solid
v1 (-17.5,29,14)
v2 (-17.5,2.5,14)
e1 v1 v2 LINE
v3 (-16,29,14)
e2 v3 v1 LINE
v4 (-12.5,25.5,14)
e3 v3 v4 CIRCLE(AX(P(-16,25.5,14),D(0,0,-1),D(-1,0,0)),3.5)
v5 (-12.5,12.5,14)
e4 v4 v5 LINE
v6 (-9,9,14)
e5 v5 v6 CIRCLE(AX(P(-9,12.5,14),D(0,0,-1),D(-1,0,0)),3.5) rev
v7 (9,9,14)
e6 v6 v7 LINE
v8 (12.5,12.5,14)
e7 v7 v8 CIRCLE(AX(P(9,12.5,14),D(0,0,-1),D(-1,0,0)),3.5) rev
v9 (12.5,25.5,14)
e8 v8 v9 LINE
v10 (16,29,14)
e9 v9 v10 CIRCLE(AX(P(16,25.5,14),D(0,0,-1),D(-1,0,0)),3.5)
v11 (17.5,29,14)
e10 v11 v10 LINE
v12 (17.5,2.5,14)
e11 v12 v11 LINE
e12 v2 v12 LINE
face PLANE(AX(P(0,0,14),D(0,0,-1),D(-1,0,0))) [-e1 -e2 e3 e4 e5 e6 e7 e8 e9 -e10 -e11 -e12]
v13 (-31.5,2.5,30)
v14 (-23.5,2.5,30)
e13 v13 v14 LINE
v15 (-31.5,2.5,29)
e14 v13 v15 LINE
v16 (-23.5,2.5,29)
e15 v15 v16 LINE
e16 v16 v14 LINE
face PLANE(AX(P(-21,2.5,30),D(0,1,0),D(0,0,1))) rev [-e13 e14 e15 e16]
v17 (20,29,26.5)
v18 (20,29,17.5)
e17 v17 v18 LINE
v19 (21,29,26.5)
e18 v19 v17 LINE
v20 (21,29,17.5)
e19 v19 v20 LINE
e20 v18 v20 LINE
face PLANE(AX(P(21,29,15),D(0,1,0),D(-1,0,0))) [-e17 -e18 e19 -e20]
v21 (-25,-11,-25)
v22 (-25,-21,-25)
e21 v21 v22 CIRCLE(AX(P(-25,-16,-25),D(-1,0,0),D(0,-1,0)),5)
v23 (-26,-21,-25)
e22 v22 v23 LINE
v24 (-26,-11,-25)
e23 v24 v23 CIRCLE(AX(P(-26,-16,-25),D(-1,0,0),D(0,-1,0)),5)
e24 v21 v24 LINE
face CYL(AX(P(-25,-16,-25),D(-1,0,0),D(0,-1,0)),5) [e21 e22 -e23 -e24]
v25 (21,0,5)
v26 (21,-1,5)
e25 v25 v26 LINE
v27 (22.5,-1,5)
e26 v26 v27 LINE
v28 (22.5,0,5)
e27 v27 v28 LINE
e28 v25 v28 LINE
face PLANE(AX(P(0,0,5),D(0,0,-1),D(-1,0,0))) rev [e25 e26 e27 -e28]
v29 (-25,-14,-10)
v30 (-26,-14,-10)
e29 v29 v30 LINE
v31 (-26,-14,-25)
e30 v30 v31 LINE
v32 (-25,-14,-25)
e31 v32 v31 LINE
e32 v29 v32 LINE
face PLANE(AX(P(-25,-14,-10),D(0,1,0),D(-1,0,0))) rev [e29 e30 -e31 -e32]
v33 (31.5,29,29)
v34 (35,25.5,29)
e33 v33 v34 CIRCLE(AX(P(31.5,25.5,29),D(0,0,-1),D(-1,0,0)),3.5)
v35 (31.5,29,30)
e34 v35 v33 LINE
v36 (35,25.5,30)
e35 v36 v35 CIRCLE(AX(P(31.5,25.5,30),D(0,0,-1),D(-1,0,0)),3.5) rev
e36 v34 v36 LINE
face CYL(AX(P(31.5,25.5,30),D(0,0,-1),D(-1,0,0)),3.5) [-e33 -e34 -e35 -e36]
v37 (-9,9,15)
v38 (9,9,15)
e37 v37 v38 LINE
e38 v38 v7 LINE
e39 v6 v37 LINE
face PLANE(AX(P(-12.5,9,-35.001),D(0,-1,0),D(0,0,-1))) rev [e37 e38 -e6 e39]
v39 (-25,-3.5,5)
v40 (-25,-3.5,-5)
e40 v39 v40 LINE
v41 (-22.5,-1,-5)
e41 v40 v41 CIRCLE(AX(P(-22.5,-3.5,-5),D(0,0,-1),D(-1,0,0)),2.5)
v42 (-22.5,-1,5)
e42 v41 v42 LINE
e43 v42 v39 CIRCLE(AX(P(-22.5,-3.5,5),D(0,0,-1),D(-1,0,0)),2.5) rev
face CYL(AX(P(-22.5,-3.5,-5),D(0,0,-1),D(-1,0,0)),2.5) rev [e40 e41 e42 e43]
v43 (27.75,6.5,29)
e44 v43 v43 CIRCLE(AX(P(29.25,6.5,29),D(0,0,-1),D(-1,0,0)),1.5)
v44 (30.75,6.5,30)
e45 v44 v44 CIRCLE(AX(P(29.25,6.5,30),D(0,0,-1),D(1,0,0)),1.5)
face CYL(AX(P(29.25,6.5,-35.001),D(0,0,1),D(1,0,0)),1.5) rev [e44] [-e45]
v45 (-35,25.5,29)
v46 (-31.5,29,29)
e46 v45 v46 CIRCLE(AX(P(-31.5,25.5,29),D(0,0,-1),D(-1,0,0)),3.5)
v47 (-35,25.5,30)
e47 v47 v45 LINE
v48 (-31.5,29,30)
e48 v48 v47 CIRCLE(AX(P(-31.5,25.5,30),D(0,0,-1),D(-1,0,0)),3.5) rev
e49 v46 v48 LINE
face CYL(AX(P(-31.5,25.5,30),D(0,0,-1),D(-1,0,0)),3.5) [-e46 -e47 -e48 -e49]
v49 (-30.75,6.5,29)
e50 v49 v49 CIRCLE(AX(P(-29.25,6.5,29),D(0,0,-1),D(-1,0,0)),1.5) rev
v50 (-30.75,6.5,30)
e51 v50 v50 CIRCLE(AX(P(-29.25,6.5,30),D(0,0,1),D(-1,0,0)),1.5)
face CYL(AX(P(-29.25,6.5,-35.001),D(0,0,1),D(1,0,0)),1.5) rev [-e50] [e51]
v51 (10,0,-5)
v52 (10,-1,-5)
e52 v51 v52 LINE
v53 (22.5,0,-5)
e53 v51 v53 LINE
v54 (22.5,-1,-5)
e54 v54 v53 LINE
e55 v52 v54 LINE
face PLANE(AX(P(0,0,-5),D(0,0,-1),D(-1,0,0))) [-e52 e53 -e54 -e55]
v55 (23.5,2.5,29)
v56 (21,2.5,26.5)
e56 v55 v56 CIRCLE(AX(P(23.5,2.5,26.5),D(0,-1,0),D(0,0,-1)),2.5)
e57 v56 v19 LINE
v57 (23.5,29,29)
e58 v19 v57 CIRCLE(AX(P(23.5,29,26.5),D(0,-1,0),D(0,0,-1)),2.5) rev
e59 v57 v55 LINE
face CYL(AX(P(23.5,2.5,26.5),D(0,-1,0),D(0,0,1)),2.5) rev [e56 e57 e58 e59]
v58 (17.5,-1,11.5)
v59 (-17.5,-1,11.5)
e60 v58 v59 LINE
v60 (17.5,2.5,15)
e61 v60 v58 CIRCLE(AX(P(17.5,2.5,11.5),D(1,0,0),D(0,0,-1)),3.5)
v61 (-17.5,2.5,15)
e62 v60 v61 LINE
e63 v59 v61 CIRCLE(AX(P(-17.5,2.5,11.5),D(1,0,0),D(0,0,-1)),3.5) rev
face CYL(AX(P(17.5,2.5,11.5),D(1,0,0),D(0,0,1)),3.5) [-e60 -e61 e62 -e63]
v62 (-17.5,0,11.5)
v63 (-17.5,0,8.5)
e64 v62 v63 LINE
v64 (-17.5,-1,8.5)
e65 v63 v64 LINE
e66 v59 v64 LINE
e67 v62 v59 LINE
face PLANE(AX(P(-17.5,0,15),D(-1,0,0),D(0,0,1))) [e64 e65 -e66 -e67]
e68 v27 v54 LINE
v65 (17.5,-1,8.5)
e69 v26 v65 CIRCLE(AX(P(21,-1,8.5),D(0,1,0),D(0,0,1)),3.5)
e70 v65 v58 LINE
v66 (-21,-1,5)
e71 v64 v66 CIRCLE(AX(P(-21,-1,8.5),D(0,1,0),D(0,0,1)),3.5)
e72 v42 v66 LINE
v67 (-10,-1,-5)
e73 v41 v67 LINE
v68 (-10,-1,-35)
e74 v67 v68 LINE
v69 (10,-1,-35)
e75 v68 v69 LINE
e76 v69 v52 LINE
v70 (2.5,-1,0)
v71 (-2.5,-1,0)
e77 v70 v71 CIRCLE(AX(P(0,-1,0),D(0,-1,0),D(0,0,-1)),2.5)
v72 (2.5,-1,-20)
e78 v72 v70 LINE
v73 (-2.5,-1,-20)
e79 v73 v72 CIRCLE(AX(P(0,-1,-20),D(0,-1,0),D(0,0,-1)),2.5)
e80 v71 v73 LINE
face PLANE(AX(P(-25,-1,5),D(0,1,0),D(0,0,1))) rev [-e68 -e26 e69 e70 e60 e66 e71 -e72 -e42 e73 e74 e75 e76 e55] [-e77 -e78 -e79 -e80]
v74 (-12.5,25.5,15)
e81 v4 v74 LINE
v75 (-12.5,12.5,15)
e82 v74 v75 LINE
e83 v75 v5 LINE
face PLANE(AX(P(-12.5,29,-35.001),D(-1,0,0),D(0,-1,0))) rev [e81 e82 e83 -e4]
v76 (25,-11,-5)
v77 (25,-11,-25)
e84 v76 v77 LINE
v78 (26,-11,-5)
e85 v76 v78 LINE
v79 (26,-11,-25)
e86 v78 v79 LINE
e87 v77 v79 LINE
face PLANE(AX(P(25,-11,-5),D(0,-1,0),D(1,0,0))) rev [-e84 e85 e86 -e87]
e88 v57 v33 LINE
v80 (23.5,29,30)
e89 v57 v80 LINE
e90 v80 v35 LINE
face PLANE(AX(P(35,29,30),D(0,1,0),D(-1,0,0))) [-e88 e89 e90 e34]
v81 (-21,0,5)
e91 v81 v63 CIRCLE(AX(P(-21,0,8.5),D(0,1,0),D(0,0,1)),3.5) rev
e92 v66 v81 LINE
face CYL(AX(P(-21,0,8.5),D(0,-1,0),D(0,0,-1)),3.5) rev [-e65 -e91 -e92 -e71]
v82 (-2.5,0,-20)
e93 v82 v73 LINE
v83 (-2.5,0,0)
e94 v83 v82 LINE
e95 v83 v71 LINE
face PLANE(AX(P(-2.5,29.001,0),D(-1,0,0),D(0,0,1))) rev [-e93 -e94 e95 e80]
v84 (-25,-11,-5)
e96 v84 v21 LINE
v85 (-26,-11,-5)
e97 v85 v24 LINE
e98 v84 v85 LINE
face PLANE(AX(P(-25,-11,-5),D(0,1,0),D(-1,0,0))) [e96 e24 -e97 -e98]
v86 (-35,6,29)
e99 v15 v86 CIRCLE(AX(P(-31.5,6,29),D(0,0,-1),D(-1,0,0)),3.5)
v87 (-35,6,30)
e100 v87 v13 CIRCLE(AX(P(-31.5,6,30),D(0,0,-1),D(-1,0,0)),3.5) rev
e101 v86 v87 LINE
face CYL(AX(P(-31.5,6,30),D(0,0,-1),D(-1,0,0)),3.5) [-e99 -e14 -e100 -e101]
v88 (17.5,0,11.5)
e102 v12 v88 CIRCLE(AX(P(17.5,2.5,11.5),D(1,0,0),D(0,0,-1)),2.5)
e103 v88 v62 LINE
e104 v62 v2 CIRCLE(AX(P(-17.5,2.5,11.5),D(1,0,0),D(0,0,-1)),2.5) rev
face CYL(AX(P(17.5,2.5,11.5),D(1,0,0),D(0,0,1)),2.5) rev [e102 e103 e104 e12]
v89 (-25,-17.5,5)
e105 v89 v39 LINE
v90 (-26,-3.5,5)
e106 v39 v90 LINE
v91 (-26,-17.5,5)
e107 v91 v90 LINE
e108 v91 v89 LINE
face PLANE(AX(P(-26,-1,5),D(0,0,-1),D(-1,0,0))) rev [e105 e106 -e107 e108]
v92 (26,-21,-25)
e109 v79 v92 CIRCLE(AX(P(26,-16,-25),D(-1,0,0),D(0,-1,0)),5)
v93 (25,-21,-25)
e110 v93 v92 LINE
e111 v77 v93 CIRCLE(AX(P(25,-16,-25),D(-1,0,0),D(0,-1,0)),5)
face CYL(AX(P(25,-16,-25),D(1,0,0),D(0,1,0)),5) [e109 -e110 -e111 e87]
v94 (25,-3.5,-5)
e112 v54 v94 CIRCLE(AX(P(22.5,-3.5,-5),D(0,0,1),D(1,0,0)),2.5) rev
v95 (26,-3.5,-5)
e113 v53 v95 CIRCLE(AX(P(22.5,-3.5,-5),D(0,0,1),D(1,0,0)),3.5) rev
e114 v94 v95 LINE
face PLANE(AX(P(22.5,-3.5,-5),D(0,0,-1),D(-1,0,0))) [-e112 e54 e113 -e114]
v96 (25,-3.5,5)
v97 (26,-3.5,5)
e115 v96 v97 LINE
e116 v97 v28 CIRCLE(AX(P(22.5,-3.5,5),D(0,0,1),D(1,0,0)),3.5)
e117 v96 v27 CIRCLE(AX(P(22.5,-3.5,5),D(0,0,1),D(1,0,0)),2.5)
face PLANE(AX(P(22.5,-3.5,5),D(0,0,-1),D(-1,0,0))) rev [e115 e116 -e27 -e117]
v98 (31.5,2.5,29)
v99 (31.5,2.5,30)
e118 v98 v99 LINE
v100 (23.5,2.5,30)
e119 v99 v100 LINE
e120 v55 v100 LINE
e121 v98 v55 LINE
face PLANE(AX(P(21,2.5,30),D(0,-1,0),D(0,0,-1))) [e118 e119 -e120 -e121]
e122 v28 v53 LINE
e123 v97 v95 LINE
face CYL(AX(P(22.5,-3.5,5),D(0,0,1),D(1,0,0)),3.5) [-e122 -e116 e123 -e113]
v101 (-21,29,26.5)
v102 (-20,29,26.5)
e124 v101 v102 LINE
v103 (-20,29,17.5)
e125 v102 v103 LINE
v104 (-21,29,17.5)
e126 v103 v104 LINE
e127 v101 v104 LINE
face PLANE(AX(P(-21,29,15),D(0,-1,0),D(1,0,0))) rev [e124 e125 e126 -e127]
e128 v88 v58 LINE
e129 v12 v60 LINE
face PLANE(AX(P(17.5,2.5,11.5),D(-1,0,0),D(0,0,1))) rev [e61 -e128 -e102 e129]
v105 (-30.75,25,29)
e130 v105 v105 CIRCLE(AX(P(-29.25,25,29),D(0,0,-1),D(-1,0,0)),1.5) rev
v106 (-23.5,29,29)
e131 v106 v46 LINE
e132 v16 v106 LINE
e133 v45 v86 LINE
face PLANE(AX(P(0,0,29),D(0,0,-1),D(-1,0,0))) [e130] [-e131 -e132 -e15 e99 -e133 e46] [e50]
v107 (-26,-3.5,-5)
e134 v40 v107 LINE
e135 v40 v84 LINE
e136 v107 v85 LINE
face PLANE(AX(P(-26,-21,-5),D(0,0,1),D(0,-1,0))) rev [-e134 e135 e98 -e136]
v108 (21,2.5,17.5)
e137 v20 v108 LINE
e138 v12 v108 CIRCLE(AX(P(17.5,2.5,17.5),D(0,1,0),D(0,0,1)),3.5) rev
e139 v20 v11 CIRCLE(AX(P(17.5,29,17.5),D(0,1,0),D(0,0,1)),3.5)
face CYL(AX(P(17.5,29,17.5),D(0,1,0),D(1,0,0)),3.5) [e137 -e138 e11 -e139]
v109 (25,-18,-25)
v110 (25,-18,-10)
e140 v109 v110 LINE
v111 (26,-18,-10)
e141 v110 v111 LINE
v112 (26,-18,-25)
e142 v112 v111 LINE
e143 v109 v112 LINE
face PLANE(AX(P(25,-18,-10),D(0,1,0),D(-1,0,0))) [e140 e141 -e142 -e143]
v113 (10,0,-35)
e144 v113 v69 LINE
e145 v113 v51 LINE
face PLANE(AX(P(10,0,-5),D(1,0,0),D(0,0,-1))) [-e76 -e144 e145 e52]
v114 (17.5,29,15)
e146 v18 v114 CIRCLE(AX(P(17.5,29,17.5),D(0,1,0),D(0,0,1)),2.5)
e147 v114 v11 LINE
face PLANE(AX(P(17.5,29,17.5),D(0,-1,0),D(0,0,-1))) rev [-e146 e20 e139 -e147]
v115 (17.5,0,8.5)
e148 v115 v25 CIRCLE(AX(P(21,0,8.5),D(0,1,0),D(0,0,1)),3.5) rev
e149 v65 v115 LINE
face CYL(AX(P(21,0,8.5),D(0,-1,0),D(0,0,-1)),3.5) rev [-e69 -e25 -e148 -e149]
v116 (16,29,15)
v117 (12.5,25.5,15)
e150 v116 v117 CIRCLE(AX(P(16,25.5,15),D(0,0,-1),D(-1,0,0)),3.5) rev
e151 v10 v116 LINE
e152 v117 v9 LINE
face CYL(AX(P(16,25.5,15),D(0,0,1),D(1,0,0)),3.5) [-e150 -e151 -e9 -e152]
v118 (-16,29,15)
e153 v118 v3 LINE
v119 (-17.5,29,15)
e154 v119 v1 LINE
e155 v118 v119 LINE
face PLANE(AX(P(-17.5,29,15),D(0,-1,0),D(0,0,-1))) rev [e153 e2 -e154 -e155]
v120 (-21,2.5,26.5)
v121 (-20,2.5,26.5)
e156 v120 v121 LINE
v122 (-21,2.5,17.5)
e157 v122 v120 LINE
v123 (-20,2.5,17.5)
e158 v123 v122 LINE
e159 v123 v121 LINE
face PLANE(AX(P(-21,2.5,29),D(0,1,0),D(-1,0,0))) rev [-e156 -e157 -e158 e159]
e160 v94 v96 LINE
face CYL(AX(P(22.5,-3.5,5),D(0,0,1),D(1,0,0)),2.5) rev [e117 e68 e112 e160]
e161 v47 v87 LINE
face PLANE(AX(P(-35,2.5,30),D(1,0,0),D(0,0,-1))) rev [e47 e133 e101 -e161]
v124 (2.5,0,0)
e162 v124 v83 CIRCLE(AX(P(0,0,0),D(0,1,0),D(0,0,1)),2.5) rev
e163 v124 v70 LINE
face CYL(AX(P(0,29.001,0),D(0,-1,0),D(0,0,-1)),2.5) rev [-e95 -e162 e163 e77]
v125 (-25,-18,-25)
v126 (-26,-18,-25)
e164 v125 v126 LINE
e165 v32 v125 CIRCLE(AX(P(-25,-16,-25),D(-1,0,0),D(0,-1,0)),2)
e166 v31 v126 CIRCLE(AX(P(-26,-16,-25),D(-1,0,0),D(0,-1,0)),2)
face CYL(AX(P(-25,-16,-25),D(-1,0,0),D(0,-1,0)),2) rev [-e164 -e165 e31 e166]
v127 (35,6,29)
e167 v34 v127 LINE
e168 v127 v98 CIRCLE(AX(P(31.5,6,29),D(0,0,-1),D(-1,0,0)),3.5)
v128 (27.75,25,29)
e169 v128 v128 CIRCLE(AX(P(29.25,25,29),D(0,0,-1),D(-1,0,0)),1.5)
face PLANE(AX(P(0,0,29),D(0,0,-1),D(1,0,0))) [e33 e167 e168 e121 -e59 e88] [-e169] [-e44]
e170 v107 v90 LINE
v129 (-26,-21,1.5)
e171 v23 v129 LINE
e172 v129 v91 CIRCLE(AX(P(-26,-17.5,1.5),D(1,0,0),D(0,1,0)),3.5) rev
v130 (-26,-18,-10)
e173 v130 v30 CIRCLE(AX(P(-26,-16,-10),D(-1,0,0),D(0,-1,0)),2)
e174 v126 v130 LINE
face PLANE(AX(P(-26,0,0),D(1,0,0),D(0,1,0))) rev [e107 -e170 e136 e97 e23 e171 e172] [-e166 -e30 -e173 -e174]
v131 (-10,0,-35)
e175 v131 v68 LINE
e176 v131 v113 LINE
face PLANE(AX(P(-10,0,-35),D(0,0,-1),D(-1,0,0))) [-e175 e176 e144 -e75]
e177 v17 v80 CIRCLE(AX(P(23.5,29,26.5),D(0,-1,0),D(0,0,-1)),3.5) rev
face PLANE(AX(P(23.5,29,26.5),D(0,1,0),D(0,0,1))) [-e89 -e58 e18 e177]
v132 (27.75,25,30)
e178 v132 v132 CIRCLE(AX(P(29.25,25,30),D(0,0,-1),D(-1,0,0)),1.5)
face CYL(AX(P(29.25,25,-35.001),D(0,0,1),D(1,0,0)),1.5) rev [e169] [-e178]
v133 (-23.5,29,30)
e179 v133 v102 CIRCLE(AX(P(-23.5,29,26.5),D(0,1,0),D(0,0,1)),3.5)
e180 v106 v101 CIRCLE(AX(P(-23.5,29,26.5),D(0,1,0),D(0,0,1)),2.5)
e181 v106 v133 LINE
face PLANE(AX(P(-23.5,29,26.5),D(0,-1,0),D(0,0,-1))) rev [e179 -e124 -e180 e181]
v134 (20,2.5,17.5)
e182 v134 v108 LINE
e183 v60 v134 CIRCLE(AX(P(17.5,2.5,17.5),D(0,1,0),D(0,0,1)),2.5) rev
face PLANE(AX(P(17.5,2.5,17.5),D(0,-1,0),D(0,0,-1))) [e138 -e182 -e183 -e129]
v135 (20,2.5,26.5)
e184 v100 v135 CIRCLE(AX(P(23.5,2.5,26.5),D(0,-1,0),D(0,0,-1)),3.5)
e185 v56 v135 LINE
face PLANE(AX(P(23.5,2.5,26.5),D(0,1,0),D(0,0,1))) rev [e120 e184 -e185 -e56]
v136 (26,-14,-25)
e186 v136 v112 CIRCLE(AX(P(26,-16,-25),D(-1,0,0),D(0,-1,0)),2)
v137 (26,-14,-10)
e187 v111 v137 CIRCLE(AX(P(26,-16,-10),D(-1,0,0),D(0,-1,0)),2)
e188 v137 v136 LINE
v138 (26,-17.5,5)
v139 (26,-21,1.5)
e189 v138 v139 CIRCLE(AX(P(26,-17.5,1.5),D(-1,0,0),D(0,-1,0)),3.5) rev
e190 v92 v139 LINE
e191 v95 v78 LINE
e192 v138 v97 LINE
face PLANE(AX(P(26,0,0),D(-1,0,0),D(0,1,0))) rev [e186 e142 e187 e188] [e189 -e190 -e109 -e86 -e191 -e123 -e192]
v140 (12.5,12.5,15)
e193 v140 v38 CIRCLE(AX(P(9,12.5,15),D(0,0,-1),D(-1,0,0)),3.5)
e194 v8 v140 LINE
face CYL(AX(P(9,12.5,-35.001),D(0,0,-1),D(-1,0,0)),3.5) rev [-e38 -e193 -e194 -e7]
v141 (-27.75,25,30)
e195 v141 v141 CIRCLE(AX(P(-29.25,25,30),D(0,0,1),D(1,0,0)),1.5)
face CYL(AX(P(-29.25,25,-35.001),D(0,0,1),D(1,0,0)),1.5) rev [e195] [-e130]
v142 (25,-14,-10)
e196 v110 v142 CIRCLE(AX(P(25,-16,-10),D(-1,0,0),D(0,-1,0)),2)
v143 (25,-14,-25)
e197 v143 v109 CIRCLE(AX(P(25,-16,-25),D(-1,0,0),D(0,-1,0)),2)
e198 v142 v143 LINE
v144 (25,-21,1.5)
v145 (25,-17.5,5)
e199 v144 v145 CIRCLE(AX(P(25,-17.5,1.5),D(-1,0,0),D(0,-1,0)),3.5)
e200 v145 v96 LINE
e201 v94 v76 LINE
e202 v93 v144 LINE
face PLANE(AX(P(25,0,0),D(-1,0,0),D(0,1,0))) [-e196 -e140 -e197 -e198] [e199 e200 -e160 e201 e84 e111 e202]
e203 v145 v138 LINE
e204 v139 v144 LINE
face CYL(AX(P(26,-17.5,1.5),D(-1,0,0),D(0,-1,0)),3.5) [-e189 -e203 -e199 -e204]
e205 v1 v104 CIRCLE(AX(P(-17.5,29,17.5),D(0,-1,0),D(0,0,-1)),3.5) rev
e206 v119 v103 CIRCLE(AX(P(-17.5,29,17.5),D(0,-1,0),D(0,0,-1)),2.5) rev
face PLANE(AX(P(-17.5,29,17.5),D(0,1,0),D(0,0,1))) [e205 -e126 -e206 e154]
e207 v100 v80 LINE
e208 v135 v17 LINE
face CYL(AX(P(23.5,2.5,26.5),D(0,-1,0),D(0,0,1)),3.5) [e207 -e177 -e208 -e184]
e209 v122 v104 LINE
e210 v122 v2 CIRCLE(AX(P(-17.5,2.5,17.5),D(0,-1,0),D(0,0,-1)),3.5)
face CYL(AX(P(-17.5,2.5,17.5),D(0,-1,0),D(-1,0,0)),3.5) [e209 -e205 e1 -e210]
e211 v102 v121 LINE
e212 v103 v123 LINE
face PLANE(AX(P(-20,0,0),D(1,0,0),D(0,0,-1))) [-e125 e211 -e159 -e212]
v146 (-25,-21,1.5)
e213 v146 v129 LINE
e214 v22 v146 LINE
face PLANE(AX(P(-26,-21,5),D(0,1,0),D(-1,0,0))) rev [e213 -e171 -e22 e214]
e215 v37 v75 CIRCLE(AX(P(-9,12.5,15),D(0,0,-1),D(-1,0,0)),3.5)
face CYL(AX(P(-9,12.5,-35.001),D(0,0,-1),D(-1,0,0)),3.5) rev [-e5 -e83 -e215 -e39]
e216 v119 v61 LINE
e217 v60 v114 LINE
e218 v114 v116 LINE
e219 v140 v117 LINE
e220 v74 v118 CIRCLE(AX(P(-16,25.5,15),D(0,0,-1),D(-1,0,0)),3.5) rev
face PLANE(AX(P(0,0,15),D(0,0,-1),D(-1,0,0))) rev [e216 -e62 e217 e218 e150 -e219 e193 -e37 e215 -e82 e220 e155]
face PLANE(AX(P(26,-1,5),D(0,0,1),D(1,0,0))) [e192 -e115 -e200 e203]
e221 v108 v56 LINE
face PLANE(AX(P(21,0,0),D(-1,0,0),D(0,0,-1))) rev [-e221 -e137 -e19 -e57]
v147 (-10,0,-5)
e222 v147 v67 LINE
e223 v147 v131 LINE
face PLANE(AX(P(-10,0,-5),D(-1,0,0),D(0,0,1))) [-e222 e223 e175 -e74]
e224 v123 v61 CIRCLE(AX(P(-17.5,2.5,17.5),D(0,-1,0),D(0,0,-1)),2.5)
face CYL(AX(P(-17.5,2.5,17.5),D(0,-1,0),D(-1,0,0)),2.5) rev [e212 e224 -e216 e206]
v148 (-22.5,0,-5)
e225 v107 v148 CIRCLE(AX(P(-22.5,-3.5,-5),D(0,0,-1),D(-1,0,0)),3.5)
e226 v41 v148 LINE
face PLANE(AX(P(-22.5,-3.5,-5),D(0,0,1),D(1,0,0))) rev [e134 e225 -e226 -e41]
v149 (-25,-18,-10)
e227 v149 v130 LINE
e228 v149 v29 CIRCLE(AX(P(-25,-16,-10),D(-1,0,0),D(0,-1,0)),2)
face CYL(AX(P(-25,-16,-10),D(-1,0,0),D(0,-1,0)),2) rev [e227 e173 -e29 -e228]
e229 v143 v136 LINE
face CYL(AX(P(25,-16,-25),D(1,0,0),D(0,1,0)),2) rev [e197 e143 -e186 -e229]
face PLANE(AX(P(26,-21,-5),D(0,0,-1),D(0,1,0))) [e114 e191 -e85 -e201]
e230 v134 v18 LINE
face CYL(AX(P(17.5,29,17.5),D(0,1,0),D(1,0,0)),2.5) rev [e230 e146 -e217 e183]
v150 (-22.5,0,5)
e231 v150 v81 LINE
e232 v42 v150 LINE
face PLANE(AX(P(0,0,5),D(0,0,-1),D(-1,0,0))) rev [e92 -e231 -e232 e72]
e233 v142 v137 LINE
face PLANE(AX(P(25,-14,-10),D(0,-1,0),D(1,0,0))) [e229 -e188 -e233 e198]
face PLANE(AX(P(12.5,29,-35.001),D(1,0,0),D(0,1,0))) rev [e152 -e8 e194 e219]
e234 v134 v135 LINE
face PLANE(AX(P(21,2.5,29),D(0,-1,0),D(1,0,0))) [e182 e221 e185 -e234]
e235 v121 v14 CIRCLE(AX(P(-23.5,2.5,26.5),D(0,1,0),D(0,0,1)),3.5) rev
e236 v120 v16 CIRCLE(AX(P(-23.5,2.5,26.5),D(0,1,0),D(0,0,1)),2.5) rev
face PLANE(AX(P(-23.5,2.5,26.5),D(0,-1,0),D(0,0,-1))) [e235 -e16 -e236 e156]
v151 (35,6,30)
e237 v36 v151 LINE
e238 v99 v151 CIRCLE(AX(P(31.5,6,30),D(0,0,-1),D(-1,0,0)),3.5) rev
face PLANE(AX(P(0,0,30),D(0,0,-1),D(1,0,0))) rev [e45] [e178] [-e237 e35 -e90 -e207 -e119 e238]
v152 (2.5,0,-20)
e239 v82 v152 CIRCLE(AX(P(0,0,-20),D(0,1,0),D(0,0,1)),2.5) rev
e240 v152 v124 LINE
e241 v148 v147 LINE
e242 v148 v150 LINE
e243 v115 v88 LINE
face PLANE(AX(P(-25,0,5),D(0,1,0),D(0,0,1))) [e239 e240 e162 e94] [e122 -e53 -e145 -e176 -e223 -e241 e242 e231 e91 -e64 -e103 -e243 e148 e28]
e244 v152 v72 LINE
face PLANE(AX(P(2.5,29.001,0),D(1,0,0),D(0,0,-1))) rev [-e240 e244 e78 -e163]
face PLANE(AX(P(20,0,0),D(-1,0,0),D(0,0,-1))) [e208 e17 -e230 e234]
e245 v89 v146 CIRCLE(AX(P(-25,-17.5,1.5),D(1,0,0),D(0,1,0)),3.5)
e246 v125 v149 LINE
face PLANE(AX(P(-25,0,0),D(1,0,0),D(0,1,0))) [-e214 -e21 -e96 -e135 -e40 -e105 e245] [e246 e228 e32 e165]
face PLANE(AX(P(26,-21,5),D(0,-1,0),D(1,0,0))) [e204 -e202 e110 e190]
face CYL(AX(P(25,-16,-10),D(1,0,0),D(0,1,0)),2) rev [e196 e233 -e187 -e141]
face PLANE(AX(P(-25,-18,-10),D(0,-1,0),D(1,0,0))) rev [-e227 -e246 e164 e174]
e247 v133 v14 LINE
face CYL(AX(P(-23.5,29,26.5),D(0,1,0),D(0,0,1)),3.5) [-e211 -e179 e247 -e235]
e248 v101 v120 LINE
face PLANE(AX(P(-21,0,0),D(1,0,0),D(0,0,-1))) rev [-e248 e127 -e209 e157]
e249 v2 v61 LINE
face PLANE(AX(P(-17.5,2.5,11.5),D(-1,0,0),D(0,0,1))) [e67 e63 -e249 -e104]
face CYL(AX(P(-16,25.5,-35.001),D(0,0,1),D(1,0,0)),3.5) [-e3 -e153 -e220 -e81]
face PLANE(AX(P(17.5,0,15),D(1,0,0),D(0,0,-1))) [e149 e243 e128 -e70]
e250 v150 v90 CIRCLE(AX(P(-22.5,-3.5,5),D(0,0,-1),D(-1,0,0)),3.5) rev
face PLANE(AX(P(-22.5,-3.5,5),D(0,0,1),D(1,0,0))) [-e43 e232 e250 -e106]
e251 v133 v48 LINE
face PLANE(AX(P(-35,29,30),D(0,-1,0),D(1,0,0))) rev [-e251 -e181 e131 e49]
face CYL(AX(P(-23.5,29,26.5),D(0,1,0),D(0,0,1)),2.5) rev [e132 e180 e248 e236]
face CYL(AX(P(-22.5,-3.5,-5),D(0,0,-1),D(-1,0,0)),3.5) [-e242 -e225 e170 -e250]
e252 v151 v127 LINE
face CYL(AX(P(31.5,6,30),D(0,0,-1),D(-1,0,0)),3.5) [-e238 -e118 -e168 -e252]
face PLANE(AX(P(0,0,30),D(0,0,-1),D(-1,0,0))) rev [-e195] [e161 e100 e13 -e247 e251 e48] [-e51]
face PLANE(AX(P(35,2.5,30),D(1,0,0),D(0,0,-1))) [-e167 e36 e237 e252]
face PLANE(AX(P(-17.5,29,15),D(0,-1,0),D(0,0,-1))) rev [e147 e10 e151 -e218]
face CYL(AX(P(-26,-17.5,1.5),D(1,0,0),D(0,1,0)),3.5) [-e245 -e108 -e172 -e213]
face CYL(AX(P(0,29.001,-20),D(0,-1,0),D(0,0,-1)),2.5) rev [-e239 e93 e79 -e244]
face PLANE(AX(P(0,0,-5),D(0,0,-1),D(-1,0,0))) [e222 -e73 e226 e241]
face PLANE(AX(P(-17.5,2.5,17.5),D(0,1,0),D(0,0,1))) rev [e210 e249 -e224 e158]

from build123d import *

# Parameters (mm, degrees)
SKETCH_1_W                       = 50
SKETCH_1_H                       = 1
SM_BASE_FLANGE_1_DEPTH           = 5
SM_EDGE_FLANGE_1_STRIP_W         = 9
SM_EDGE_FLANGE_1_STRIP_H         = 1
SM_EDGE_FLANGE_1_STRIP_CUT_DEPTH = 10
SM_EDGE_FLANGE_1_DEPTH           = 10
SM_BASE_FLANGE_1_2_DEPTH         = 1
SKETCH_12_W                      = 20
SKETCH_12_H                      = 30
SKETCH_12_W_2                    = 35
SKETCH_12_H_2                    = 10
SM_BASE_FLANGE_2_DEPTH           = 1
SM_EDGE_FLANGE_3_STRIP_W         = 9
SM_EDGE_FLANGE_3_STRIP_H         = 1
SM_EDGE_FLANGE_3_STRIP_CUT_DEPTH = 35
SM_EDGE_FLANGE_3_DEPTH           = 35
CUT_EXTRUDE_1_REACH              = 65.38
SKETCH_21_W                      = 25
SKETCH_21_H                      = 20
SM_EDGE_FLANGE_4_DEPTH           = 26.5
SM_EDGE_FLANGE_5_STRIP_W         = 9
SM_EDGE_FLANGE_5_STRIP_H         = 1
SM_EDGE_FLANGE_5_STRIP_CUT_DEPTH = 26.5
SM_EDGE_FLANGE_5_DEPTH           = 26.5
CUT_EXTRUDE_2_REACH              = 81.316
SKETCH_28_R                      = 1.5
FILLET_1_R                       = 3.5
CUT_EXTRUDE_3_REACH              = 59.879


# Sheet-metal steps are written as plain solids
with BuildPart() as part:
    # Sketch 1 → Sm Base Flange 1 (new, symmetric)
    with BuildSketch(Plane.XY):
        with Locations((0, -0.5)):
            Rectangle(SKETCH_1_W, SKETCH_1_H)
    extrude(amount=SM_BASE_FLANGE_1_DEPTH, both=True)

    # 边线-法兰1 strip (across the edge) → 边线-法兰1 strip cut (cut)
    with BuildSketch(Plane(origin=(-25, -1, 5), x_dir=(1, 0, 0), z_dir=(0, 0, -1))):
        with Locations((-2, -0.5)):
            Rectangle(SM_EDGE_FLANGE_1_STRIP_W, SM_EDGE_FLANGE_1_STRIP_H)
    sm_edge_flange_1_strip_cut = extrude(amount=SM_EDGE_FLANGE_1_STRIP_CUT_DEPTH, mode=Mode.SUBTRACT)

    # 边线-法兰1 section (across the edge) → 边线-法兰1 (add)
    with BuildSketch(Plane(origin=(-25, -1, 5), x_dir=(1, 0, 0), z_dir=(0, 0, -1))):
        with BuildLine():
            Line((-1, 2.5), (-1, 20))
            Line((-1, 20), (0, 20))
            Line((0, 20), (0, 2.5))
            ThreePointArc((0, 2.5), (0.732233047, 0.732233047), (2.5, 0))
            Line((2.5, 0), (2.5, -1))
            ThreePointArc((2.5, -1), (0.025126266, 0.025126266), (-1, 2.5))
        make_face()
    sm_edge_flange_1 = extrude(amount=SM_EDGE_FLANGE_1_DEPTH)

    # 草图9 → Sm Base Flange 1 2 (add)
    with BuildSketch(Plane.ZY.offset(26)):
        with BuildLine():
            Line((-5, -21), (-25, -21))
            ThreePointArc((-25, -21), (-30, -16), (-25, -11))
            Line((-25, -11), (-5, -11))
            Line((-5, -11), (-5, -21))
        make_face()
        with BuildLine():
            Line((-10, -18), (-25, -18))
            ThreePointArc((-25, -18), (-27, -16), (-25, -14))
            Line((-25, -14), (-10, -14))
            ThreePointArc((-10, -14), (-8, -16), (-10, -18))
        make_face(mode=Mode.SUBTRACT)
    sm_base_flange_1_2 = extrude(amount=-SM_BASE_FLANGE_1_2_DEPTH)

    # 镜向1: 边线-法兰1 strip cut, 边线-法兰1, Sm Base Flange 1 2 across plane
    add(sm_edge_flange_1_strip_cut.mirror(Plane(origin=(0, 0, 0), x_dir=(0, 0, 1), z_dir=(1, 0, 0))), mode=Mode.SUBTRACT)
    add(sm_edge_flange_1.mirror(Plane(origin=(0, 0, 0), x_dir=(0, 0, 1), z_dir=(1, 0, 0))))
    add(sm_base_flange_1_2.mirror(Plane(origin=(0, 0, 0), x_dir=(0, 0, 1), z_dir=(1, 0, 0))))

    # 草图12 → 薄片2 (add)
    with BuildSketch(Plane.XZ.offset(1)):
        with Locations((0, -20)):
            Rectangle(SKETCH_12_W, SKETCH_12_H)
        with Locations((0, 10)):
            Rectangle(SKETCH_12_W_2, SKETCH_12_H_2)
    extrude(amount=-SM_BASE_FLANGE_2_DEPTH)

    # 边线-法兰3 strip (across the edge) → 边线-法兰3 strip cut (cut)
    with BuildSketch(Plane(origin=(-17.5, 0, 15), x_dir=(0, 0, -1), z_dir=(1, 0, 0))):
        with Locations((-1, -0.5)):
            Rectangle(SM_EDGE_FLANGE_3_STRIP_W, SM_EDGE_FLANGE_3_STRIP_H)
    extrude(amount=SM_EDGE_FLANGE_3_STRIP_CUT_DEPTH, mode=Mode.SUBTRACT)

    # 边线-法兰3 section (across the edge) → 边线-法兰3 (add)
    with BuildSketch(Plane(origin=(-17.5, 0, 15), x_dir=(0, 0, -1), z_dir=(1, 0, 0))):
        with BuildLine():
            Line((0, 2.5), (0, 29))
            Line((0, 29), (1, 29))
            Line((1, 29), (1, 2.5))
            ThreePointArc((1, 2.5), (1.732233047, 0.732233047), (3.5, 0))
            Line((3.5, 0), (3.5, -1))
            ThreePointArc((3.5, -1), (1.025126266, 0.025126266), (0, 2.5))
        make_face()
    extrude(amount=SM_EDGE_FLANGE_3_DEPTH)

    # 草图21 → 切除-拉伸1 (cut, up to next)
    with BuildSketch(Plane.XY.offset(15), mode=Mode.PRIVATE) as cut_extrude_1_sk1:
        with Locations((0, 19)):
            Rectangle(SKETCH_21_W, SKETCH_21_H)
    cut_extrude_1_tool1 = extrude(cut_extrude_1_sk1.sketch, amount=-CUT_EXTRUDE_1_REACH, mode=Mode.PRIVATE) & part.part
    add(cut_extrude_1_tool1.solids().sort_by_distance((0, 19, 15))[0], mode=Mode.SUBTRACT)

    # 边线-法兰4 section (across the edge) → 边线-法兰4 (add)
    with BuildSketch(Plane(origin=(-20, 29, 15), x_dir=(1, 0, 0), z_dir=(0, -1, 0))):
        with BuildLine():
            Line((-1, 2.5), (-1, 14))
            Line((-1, 14), (0, 14))
            Line((0, 14), (0, 2.5))
            ThreePointArc((0, 2.5), (0.732233047, 0.732233047), (2.5, 0))
            Line((2.5, 0), (2.5, -1))
            ThreePointArc((2.5, -1), (0.025126266, 0.025126266), (-1, 2.5))
        make_face()
    sm_edge_flange_4 = extrude(amount=SM_EDGE_FLANGE_4_DEPTH)

    # 边线-法兰5 strip (across the edge) → 边线-法兰5 strip cut (cut)
    with BuildSketch(Plane(origin=(-21, 2.5, 29), x_dir=(0, 0, -1), z_dir=(0, 1, 0))):
        with Locations((-2, -0.5)):
            Rectangle(SM_EDGE_FLANGE_5_STRIP_W, SM_EDGE_FLANGE_5_STRIP_H)
    sm_edge_flange_5_strip_cut = extrude(amount=SM_EDGE_FLANGE_5_STRIP_CUT_DEPTH, mode=Mode.SUBTRACT)

    # 边线-法兰5 section (across the edge) → 边线-法兰5 (add)
    with BuildSketch(Plane(origin=(-21, 2.5, 29), x_dir=(0, 0, -1), z_dir=(0, 1, 0))):
        with BuildLine():
            Line((-1, 2.5), (-1, 14))
            Line((-1, 14), (0, 14))
            Line((0, 14), (0, 2.5))
            ThreePointArc((0, 2.5), (0.732233047, 0.732233047), (2.5, 0))
            Line((2.5, 0), (2.5, -1))
            ThreePointArc((2.5, -1), (0.025126266, 0.025126266), (-1, 2.5))
        make_face()
    sm_edge_flange_5 = extrude(amount=SM_EDGE_FLANGE_5_DEPTH)

    # 草图28 → 切除-拉伸2 (cut, up to next)
    with BuildSketch(Plane.XY.offset(30), mode=Mode.PRIVATE) as cut_extrude_2_sk1:
        with Locations((-29.25, 25)):
            Circle(SKETCH_28_R)
    cut_extrude_2_tool1 = extrude(cut_extrude_2_sk1.sketch, amount=-CUT_EXTRUDE_2_REACH, mode=Mode.PRIVATE) & part.part
    # 草图28 → 切除-拉伸2 (cut, up to next)
    with BuildSketch(Plane.XY.offset(30), mode=Mode.PRIVATE) as cut_extrude_2_sk2:
        with Locations(Location((-29.25, 6.5, 0), (0, 0, 180))):
            Circle(SKETCH_28_R)
    cut_extrude_2_tool2 = extrude(cut_extrude_2_sk2.sketch, amount=-CUT_EXTRUDE_2_REACH, mode=Mode.PRIVATE) & part.part
    cut_extrude_2_1 = cut_extrude_2_tool1.solids().sort_by_distance((-29.25, 25, 30))[0]
    add(cut_extrude_2_1, mode=Mode.SUBTRACT)
    cut_extrude_2_2 = cut_extrude_2_tool2.solids().sort_by_distance((-29.25, 6.5, 30))[0]
    add(cut_extrude_2_2, mode=Mode.SUBTRACT)
    cut_extrude_2 = cut_extrude_2_1 + cut_extrude_2_2  # 切除-拉伸2 as one shape, for the pattern or mirror that repeats it

    # 镜向2: 边线-法兰4, 边线-法兰5 strip cut, 边线-法兰5, 切除-拉伸2 across plane
    add(sm_edge_flange_4.mirror(Plane(origin=(0, 0, 0), x_dir=(0, 0, 1), z_dir=(1, 0, 0))))
    add(sm_edge_flange_5_strip_cut.mirror(Plane(origin=(0, 0, 0), x_dir=(0, 0, 1), z_dir=(1, 0, 0))), mode=Mode.SUBTRACT)
    add(sm_edge_flange_5.mirror(Plane(origin=(0, 0, 0), x_dir=(0, 0, 1), z_dir=(1, 0, 0))))
    add(cut_extrude_2.mirror(Plane(origin=(0, 0, 0), x_dir=(0, 0, 1), z_dir=(1, 0, 0))), mode=Mode.SUBTRACT)

    # 圆角1
    fillet_1_edges = [part.edges().sort_by_distance(p)[0] for p in [
        (17.5, -0.5, 5),
        (-17.5, -0.5, 5),
        (12.5, 29, 14.5),
        (12.5, 9, 14.5),
        (-12.5, 9, 14.5),
        (-12.5, 29, 14.5),
        (-35, 2.5, 29.5),
        (-35, 29, 29.5),
        (35, 29, 29.5),
        (35, 2.5, 29.5),
        (-25.5, -21, 5),
        (25.5, -21, 5),
    ]]
    fillet(fillet_1_edges, radius=FILLET_1_R)

    # 草图29 → 切除-拉伸3 (cut, up to next)
    with BuildSketch(Plane.XZ.offset(1), mode=Mode.PRIVATE) as cut_extrude_3_sk1:
        with BuildLine():
            Line((2.5, 0), (2.5, -20))
            ThreePointArc((2.5, -20), (0, -22.5), (-2.5, -20))
            Line((-2.5, -20), (-2.5, 0))
            ThreePointArc((-2.5, 0), (0, 2.5), (2.5, 0))
        make_face()
    cut_extrude_3_tool1 = extrude(cut_extrude_3_sk1.sketch, amount=-CUT_EXTRUDE_3_REACH, mode=Mode.PRIVATE) & part.part
    add(cut_extrude_3_tool1.solids().sort_by_distance((0, -1, -10))[0], mode=Mode.SUBTRACT)


solid = part.part
